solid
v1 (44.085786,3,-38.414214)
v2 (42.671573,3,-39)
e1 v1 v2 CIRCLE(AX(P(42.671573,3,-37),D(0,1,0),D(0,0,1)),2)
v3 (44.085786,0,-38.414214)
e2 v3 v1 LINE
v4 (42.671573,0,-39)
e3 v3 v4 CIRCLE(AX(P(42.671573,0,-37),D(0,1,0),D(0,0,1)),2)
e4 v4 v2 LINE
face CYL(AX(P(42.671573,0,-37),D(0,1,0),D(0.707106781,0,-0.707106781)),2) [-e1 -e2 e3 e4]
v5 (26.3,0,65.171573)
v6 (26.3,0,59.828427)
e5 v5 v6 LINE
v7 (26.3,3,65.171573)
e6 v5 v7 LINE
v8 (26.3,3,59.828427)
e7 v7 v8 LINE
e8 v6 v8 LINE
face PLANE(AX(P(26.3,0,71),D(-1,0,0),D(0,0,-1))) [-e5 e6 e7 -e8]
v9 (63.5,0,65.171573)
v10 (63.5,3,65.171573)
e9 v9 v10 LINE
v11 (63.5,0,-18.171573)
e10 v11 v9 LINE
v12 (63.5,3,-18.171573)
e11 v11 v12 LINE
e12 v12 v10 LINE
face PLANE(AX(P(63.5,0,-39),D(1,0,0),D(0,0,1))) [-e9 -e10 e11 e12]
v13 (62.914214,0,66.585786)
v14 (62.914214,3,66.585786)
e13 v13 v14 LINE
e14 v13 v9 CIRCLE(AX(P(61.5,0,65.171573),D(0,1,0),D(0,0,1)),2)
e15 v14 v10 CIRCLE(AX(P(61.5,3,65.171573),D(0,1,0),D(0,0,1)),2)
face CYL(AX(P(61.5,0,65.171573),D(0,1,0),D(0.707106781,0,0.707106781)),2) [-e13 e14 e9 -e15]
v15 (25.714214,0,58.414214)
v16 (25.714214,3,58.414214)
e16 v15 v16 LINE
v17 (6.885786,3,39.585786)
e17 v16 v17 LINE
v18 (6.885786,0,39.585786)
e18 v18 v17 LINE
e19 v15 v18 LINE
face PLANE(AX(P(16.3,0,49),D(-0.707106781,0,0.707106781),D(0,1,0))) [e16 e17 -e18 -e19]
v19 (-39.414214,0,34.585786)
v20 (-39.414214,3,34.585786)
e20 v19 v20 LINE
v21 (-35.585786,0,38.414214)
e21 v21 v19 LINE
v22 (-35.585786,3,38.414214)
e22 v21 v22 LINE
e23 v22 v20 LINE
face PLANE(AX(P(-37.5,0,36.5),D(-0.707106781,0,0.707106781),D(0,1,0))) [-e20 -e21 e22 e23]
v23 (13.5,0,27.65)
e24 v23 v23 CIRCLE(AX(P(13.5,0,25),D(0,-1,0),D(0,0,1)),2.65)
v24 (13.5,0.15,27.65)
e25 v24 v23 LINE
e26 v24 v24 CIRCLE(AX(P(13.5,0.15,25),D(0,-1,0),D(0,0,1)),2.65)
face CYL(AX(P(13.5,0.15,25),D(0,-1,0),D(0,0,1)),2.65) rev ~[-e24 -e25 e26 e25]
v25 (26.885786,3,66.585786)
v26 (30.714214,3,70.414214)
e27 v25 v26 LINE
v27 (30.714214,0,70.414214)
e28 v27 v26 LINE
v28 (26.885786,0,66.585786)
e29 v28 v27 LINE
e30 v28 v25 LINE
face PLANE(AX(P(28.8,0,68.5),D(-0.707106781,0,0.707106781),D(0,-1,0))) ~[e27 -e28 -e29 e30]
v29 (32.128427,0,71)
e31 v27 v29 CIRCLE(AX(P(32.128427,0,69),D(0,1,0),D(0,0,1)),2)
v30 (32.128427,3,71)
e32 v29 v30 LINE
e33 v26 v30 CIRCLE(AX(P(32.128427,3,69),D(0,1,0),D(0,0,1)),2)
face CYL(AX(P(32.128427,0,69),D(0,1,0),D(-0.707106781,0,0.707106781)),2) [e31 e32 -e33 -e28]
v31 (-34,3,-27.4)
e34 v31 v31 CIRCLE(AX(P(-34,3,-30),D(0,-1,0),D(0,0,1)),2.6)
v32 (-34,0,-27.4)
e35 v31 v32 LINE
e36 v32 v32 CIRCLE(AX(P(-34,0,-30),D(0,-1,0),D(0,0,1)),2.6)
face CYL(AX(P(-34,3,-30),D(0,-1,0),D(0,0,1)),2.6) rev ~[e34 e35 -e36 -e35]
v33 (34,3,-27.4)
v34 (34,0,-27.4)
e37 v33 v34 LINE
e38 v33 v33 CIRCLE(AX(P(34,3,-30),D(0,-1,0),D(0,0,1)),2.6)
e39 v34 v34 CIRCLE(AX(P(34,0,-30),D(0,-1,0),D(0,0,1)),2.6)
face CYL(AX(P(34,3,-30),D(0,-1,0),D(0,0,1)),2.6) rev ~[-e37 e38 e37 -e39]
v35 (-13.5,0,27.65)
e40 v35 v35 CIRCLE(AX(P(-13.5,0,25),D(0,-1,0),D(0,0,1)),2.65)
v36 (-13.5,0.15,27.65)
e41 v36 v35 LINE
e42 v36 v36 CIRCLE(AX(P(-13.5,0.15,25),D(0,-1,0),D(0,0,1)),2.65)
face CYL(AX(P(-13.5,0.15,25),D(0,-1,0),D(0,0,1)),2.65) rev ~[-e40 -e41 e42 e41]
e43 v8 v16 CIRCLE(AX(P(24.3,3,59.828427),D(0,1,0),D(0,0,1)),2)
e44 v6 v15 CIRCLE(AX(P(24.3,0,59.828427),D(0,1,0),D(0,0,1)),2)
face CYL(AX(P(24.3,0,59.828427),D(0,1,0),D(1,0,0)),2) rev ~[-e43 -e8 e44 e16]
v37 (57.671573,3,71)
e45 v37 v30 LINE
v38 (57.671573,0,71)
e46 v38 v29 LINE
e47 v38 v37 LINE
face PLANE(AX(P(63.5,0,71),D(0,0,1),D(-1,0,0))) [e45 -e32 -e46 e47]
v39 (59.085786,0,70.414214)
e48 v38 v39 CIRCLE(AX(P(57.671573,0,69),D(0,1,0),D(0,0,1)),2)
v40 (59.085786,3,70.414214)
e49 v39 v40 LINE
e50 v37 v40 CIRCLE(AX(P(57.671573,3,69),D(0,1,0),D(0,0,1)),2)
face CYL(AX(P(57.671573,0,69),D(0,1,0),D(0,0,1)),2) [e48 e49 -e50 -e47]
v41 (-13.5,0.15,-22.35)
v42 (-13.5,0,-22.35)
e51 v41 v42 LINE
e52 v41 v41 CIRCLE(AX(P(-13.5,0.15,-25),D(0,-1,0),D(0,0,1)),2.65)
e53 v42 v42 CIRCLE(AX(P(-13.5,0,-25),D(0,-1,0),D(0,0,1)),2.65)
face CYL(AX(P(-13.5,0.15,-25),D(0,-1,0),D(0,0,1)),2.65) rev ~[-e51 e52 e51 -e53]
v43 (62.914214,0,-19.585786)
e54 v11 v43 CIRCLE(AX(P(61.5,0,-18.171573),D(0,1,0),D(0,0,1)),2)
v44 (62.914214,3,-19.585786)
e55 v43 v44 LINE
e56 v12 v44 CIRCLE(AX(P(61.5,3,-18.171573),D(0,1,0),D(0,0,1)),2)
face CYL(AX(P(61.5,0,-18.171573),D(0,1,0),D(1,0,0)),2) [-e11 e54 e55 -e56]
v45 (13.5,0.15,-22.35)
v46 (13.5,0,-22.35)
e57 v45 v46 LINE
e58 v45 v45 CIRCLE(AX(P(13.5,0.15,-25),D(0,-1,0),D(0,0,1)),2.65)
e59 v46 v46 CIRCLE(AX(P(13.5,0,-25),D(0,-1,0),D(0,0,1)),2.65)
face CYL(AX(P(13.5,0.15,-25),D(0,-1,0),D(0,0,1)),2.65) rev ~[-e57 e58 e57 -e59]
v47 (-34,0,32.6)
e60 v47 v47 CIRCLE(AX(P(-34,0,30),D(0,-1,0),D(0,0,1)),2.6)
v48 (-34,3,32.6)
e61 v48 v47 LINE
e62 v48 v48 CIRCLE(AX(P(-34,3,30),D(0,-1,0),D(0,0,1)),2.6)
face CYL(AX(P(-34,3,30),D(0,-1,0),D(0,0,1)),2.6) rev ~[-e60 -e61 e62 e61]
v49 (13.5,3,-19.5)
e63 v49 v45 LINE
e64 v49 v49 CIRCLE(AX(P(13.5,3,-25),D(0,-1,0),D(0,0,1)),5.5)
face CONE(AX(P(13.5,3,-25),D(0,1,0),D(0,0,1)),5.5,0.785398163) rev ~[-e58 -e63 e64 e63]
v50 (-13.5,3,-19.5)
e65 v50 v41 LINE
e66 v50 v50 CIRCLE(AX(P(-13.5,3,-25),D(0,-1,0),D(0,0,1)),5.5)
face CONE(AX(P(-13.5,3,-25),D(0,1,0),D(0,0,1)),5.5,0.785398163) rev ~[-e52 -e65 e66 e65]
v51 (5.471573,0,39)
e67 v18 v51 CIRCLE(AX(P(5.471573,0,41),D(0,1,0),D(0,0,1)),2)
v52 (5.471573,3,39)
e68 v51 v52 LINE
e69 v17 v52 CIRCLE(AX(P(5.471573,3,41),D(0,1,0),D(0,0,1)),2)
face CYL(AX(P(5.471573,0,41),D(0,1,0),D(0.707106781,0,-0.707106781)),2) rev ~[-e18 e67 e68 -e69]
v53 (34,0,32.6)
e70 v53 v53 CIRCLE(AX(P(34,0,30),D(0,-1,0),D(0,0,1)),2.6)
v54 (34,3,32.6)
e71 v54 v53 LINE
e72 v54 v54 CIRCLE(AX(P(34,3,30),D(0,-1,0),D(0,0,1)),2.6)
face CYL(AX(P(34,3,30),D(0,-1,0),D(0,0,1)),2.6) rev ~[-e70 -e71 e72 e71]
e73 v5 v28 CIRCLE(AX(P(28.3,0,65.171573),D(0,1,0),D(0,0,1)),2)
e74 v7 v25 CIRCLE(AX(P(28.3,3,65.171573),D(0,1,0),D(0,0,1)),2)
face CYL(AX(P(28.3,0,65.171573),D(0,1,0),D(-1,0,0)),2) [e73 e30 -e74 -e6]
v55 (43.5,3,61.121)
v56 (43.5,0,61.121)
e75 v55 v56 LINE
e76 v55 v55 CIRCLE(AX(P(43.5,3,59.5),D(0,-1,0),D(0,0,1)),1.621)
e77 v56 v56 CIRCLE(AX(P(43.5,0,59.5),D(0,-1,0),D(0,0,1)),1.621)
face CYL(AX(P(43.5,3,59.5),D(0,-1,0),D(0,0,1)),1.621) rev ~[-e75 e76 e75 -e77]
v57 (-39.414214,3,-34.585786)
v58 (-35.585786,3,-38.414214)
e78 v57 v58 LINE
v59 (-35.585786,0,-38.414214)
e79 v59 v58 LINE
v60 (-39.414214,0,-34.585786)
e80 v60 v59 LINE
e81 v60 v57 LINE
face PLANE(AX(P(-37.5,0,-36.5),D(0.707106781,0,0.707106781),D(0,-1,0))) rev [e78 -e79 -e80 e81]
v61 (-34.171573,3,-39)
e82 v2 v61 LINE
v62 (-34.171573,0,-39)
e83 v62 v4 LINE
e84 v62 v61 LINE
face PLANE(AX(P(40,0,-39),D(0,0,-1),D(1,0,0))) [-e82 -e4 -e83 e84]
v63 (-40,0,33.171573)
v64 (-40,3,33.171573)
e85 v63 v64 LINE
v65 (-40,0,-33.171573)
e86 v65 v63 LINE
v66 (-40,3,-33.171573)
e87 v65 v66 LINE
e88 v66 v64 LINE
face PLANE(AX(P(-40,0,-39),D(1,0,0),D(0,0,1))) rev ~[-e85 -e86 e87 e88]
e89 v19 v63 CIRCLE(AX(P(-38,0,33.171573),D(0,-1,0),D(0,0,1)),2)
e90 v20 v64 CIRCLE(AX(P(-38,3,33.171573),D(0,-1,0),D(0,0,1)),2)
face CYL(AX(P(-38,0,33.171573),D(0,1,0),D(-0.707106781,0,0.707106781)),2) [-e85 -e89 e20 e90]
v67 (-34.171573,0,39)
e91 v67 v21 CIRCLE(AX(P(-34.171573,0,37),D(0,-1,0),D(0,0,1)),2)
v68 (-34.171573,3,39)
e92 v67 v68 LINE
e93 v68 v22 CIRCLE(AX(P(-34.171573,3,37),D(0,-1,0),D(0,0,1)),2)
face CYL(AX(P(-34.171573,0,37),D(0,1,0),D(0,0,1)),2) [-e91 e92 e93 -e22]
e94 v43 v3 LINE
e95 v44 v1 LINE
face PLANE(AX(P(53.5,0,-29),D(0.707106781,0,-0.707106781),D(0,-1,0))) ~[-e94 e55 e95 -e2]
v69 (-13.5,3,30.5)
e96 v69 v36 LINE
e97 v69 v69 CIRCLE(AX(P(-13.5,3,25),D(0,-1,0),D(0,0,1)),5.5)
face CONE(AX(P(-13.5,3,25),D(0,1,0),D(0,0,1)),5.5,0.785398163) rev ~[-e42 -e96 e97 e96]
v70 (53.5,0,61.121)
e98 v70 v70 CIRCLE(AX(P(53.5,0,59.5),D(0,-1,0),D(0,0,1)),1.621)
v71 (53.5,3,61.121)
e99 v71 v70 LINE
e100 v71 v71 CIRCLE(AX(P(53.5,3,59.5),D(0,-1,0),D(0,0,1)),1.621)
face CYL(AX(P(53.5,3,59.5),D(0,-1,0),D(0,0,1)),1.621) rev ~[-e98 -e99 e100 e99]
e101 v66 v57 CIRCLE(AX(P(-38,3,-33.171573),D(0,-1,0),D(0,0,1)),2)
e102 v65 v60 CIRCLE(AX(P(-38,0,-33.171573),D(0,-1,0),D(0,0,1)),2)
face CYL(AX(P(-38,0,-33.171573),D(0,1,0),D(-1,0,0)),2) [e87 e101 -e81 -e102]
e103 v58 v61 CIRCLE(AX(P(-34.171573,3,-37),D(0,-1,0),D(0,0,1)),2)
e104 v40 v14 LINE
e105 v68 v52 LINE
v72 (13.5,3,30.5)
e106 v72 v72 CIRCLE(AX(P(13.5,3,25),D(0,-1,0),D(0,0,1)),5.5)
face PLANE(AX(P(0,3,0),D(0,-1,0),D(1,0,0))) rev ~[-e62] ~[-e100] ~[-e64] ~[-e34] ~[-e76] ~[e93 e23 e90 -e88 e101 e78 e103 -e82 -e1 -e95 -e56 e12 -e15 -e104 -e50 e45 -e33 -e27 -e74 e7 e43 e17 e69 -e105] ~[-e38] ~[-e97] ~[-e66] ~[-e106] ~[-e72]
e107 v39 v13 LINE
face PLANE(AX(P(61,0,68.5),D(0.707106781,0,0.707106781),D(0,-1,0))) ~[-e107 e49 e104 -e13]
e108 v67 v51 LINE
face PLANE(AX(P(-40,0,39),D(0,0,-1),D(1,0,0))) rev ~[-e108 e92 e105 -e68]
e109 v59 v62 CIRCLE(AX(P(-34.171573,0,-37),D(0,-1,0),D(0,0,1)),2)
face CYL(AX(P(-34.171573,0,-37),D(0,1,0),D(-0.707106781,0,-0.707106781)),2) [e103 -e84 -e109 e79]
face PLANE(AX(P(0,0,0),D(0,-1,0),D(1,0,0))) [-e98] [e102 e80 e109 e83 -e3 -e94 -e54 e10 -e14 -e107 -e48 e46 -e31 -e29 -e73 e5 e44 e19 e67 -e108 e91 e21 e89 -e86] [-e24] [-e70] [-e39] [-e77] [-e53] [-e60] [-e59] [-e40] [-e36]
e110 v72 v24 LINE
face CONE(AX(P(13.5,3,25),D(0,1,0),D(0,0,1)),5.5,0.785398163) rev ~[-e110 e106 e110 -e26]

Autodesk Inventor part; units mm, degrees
ref_plane "YZ Plane" through (0, 0, 0) normal (1, 0, 0) x (0, 1, 0)
ref_plane "XZ Plane" through (0, 0, 0) normal (0, 1, 0) x (-1, 0, 0)
ref_plane "XY Plane" through (0, 0, 0) normal (0, 0, 1) x (1, 0, 0)
sketch "スケッチ1" plane through (0, 0, 0) normal (0, 1, 0) x (-1, 0, 0)
  line L0 (-40, -39) -> (40, -39)
  line L1 (40, -39) -> (40, 39)
  line L2 (40, 39) -> (-40, 39)
  line L3 (-40, 39) -> (-40, -39)
  line L4 (-40, -39) -> (40, 39) construction
  line L5 (40, -39) -> (-40, 39) construction
  point P0 (0, 0)
  dimension "d0" = 80
  dimension "d1" = 78
extrude "押し出し1" add sketch "スケッチ1" along normal blind 3
sketch "スケッチ2" plane through (0, 3, 0) normal (0, 1, 0) x (1, 0, 0)
  line L0 (34, 30) -> (-34, 30)
  line L1 (-34, 30) -> (-34, -30)
  line L2 (-34, -30) -> (34, -30)
  line L3 (34, -30) -> (34, 30)
  line L4 (34, 30) -> (-34, -30) construction
  line L5 (-34, 30) -> (34, -30) construction
  point P0 (0, 0)
  dimension "d4" = 68
  dimension "d5" = 60
hole "穴1" at (-34, 3, 30) at (34, 3, 30) at (34, 3, -30) at (-34, 3, -30) direction (0, -1, 0) diameter 5.2 depth 8 tip angle 118
sketch "スケッチ3" plane through (0, 3, 0) normal (0, 1, 0) x (1, 0, 0)
  line L0 (13.5, 25) -> (-13.5, 25)
  line L1 (-13.5, 25) -> (-13.5, -25)
  line L2 (-13.5, -25) -> (13.5, -25)
  line L3 (13.5, -25) -> (13.5, 25)
  line L4 (13.5, 25) -> (-13.5, -25) construction
  line L5 (-13.5, 25) -> (13.5, -25) construction
  point P0 (0, 0)
  dimension "d13" = 27
  dimension "d14" = 50
hole "穴2" at (-13.5, 3, 25) at (13.5, 3, 25) at (13.5, 3, -25) at (-13.5, 3, -25) direction (0, -1, 0) diameter 5.3 depth 8 tip angle 118 countersink diameter 11 countersink angle 90
sketch "スケッチ4" plane through (0, 0, 0) normal (0, -1, 0) x (1, 0, 0)
  line L0 (40, -39) -> (-40, -39) projected
  line L1 (26.3, -39) -> (63.5, -39)
  line L2 (63.5, -39) -> (63.5, 71)
  line L3 (63.5, 71) -> (26.3, 71)
  line L4 (26.3, 71) -> (26.3, -39)
  circle A0 centre (13.5, -25) radius 2.65 projected
  circle A1 centre (-13.5, 25) radius 2.65 projected
  circle A2 centre (13.5, 25) radius 2.65 projected
  circle A3 centre (-13.5, -25) radius 2.65 projected
  circle A4 centre (34, -30) radius 2.6 projected
  circle A5 centre (-34, 30) radius 2.6 projected
  circle A6 centre (34, 30) radius 2.6 projected
  circle A7 centre (-34, -30) radius 2.6 projected
  line L5 (-40, -39) -> (-40, 39) projected
  line L6 (40, -39) -> (-40, -39) projected
  line L7 (40, 39) -> (40, -39) projected
  line L8 (-40, 39) -> (40, 39) projected
  point P0 (0, 0)
  point P1 (26.3, 39)
  dimension "d23" = 110
  dimension "d24" = 50
extrude "押し出し2" add sketch "スケッチ4" against normal up to surface (3 mm away) contours L7 L8 L4 L3 L2 L1
sketch "スケッチ5" plane through (0, 3, 0) normal (0, 1, 0) x (1, 0, 0)
  circle A0 centre (13.5, 25) radius 5.5 projected
  circle A1 centre (-13.5, -25) radius 5.5 projected
  circle A2 centre (13.5, -25) radius 5.5 projected
  circle A3 centre (-13.5, 25) radius 5.5 projected
  circle A4 centre (34, 30) radius 2.6 projected
  circle A5 centre (-34, -30) radius 2.6 projected
  circle A6 centre (34, -30) radius 2.6 projected
  circle A7 centre (-34, 30) radius 2.6 projected
  line L0 (63.5, 39) -> (63.5, -71) projected
  line L1 (-40, 39) -> (63.5, 39) projected
  line L2 (-40, 39) -> (-40, -39) projected
  line L3 (-40, -39) -> (26.3, -39) projected
  line L4 (26.3, -71) -> (26.3, -39) projected
  line L5 (63.5, -71) -> (26.3, -71) projected
  point P0 (0, 0)
  point P1 (53.5, -59.5)
  point P2 (43.5, -59.5)
  dimension "d28" = 10
  dimension "d29" = 11.5
  dimension "d30" = 10
hole "穴3" at (53.5, 3, 59.5) at (43.5, 3, 59.5) direction (0, -1, 0) diameter 3.242 depth 11.8 tip angle 118 thread size "M4x0.7" class "6H" standard "ISO Metric profile"
chamfer "面取り1" distance 20 angle 45 2 edges at (63.5, 1.5, -39) (26.3, 1.5, 39)
chamfer "面取り2" distance 5 angle 45 4 edges at (63.5, 1.5, 71) (26.3, 1.5, 71) (-40, 1.5, 39) (-40, 1.5, -39)
fillet "フィレット3" radius 2 12 edges at (63.5, 1.5, 66) (58.5, 1.5, 71) (31.3, 1.5, 71) (26.3, 1.5, 66) (26.3, 1.5, 59) (6.3, 1.5, 39) (-35, 1.5, 39) (-40, 1.5, 34) (-40, 1.5, -34) (-35, 1.5, -39) (63.5, 1.5, -19) (43.5, 1.5, -39)
properties part number "CCM_Mount_B"
